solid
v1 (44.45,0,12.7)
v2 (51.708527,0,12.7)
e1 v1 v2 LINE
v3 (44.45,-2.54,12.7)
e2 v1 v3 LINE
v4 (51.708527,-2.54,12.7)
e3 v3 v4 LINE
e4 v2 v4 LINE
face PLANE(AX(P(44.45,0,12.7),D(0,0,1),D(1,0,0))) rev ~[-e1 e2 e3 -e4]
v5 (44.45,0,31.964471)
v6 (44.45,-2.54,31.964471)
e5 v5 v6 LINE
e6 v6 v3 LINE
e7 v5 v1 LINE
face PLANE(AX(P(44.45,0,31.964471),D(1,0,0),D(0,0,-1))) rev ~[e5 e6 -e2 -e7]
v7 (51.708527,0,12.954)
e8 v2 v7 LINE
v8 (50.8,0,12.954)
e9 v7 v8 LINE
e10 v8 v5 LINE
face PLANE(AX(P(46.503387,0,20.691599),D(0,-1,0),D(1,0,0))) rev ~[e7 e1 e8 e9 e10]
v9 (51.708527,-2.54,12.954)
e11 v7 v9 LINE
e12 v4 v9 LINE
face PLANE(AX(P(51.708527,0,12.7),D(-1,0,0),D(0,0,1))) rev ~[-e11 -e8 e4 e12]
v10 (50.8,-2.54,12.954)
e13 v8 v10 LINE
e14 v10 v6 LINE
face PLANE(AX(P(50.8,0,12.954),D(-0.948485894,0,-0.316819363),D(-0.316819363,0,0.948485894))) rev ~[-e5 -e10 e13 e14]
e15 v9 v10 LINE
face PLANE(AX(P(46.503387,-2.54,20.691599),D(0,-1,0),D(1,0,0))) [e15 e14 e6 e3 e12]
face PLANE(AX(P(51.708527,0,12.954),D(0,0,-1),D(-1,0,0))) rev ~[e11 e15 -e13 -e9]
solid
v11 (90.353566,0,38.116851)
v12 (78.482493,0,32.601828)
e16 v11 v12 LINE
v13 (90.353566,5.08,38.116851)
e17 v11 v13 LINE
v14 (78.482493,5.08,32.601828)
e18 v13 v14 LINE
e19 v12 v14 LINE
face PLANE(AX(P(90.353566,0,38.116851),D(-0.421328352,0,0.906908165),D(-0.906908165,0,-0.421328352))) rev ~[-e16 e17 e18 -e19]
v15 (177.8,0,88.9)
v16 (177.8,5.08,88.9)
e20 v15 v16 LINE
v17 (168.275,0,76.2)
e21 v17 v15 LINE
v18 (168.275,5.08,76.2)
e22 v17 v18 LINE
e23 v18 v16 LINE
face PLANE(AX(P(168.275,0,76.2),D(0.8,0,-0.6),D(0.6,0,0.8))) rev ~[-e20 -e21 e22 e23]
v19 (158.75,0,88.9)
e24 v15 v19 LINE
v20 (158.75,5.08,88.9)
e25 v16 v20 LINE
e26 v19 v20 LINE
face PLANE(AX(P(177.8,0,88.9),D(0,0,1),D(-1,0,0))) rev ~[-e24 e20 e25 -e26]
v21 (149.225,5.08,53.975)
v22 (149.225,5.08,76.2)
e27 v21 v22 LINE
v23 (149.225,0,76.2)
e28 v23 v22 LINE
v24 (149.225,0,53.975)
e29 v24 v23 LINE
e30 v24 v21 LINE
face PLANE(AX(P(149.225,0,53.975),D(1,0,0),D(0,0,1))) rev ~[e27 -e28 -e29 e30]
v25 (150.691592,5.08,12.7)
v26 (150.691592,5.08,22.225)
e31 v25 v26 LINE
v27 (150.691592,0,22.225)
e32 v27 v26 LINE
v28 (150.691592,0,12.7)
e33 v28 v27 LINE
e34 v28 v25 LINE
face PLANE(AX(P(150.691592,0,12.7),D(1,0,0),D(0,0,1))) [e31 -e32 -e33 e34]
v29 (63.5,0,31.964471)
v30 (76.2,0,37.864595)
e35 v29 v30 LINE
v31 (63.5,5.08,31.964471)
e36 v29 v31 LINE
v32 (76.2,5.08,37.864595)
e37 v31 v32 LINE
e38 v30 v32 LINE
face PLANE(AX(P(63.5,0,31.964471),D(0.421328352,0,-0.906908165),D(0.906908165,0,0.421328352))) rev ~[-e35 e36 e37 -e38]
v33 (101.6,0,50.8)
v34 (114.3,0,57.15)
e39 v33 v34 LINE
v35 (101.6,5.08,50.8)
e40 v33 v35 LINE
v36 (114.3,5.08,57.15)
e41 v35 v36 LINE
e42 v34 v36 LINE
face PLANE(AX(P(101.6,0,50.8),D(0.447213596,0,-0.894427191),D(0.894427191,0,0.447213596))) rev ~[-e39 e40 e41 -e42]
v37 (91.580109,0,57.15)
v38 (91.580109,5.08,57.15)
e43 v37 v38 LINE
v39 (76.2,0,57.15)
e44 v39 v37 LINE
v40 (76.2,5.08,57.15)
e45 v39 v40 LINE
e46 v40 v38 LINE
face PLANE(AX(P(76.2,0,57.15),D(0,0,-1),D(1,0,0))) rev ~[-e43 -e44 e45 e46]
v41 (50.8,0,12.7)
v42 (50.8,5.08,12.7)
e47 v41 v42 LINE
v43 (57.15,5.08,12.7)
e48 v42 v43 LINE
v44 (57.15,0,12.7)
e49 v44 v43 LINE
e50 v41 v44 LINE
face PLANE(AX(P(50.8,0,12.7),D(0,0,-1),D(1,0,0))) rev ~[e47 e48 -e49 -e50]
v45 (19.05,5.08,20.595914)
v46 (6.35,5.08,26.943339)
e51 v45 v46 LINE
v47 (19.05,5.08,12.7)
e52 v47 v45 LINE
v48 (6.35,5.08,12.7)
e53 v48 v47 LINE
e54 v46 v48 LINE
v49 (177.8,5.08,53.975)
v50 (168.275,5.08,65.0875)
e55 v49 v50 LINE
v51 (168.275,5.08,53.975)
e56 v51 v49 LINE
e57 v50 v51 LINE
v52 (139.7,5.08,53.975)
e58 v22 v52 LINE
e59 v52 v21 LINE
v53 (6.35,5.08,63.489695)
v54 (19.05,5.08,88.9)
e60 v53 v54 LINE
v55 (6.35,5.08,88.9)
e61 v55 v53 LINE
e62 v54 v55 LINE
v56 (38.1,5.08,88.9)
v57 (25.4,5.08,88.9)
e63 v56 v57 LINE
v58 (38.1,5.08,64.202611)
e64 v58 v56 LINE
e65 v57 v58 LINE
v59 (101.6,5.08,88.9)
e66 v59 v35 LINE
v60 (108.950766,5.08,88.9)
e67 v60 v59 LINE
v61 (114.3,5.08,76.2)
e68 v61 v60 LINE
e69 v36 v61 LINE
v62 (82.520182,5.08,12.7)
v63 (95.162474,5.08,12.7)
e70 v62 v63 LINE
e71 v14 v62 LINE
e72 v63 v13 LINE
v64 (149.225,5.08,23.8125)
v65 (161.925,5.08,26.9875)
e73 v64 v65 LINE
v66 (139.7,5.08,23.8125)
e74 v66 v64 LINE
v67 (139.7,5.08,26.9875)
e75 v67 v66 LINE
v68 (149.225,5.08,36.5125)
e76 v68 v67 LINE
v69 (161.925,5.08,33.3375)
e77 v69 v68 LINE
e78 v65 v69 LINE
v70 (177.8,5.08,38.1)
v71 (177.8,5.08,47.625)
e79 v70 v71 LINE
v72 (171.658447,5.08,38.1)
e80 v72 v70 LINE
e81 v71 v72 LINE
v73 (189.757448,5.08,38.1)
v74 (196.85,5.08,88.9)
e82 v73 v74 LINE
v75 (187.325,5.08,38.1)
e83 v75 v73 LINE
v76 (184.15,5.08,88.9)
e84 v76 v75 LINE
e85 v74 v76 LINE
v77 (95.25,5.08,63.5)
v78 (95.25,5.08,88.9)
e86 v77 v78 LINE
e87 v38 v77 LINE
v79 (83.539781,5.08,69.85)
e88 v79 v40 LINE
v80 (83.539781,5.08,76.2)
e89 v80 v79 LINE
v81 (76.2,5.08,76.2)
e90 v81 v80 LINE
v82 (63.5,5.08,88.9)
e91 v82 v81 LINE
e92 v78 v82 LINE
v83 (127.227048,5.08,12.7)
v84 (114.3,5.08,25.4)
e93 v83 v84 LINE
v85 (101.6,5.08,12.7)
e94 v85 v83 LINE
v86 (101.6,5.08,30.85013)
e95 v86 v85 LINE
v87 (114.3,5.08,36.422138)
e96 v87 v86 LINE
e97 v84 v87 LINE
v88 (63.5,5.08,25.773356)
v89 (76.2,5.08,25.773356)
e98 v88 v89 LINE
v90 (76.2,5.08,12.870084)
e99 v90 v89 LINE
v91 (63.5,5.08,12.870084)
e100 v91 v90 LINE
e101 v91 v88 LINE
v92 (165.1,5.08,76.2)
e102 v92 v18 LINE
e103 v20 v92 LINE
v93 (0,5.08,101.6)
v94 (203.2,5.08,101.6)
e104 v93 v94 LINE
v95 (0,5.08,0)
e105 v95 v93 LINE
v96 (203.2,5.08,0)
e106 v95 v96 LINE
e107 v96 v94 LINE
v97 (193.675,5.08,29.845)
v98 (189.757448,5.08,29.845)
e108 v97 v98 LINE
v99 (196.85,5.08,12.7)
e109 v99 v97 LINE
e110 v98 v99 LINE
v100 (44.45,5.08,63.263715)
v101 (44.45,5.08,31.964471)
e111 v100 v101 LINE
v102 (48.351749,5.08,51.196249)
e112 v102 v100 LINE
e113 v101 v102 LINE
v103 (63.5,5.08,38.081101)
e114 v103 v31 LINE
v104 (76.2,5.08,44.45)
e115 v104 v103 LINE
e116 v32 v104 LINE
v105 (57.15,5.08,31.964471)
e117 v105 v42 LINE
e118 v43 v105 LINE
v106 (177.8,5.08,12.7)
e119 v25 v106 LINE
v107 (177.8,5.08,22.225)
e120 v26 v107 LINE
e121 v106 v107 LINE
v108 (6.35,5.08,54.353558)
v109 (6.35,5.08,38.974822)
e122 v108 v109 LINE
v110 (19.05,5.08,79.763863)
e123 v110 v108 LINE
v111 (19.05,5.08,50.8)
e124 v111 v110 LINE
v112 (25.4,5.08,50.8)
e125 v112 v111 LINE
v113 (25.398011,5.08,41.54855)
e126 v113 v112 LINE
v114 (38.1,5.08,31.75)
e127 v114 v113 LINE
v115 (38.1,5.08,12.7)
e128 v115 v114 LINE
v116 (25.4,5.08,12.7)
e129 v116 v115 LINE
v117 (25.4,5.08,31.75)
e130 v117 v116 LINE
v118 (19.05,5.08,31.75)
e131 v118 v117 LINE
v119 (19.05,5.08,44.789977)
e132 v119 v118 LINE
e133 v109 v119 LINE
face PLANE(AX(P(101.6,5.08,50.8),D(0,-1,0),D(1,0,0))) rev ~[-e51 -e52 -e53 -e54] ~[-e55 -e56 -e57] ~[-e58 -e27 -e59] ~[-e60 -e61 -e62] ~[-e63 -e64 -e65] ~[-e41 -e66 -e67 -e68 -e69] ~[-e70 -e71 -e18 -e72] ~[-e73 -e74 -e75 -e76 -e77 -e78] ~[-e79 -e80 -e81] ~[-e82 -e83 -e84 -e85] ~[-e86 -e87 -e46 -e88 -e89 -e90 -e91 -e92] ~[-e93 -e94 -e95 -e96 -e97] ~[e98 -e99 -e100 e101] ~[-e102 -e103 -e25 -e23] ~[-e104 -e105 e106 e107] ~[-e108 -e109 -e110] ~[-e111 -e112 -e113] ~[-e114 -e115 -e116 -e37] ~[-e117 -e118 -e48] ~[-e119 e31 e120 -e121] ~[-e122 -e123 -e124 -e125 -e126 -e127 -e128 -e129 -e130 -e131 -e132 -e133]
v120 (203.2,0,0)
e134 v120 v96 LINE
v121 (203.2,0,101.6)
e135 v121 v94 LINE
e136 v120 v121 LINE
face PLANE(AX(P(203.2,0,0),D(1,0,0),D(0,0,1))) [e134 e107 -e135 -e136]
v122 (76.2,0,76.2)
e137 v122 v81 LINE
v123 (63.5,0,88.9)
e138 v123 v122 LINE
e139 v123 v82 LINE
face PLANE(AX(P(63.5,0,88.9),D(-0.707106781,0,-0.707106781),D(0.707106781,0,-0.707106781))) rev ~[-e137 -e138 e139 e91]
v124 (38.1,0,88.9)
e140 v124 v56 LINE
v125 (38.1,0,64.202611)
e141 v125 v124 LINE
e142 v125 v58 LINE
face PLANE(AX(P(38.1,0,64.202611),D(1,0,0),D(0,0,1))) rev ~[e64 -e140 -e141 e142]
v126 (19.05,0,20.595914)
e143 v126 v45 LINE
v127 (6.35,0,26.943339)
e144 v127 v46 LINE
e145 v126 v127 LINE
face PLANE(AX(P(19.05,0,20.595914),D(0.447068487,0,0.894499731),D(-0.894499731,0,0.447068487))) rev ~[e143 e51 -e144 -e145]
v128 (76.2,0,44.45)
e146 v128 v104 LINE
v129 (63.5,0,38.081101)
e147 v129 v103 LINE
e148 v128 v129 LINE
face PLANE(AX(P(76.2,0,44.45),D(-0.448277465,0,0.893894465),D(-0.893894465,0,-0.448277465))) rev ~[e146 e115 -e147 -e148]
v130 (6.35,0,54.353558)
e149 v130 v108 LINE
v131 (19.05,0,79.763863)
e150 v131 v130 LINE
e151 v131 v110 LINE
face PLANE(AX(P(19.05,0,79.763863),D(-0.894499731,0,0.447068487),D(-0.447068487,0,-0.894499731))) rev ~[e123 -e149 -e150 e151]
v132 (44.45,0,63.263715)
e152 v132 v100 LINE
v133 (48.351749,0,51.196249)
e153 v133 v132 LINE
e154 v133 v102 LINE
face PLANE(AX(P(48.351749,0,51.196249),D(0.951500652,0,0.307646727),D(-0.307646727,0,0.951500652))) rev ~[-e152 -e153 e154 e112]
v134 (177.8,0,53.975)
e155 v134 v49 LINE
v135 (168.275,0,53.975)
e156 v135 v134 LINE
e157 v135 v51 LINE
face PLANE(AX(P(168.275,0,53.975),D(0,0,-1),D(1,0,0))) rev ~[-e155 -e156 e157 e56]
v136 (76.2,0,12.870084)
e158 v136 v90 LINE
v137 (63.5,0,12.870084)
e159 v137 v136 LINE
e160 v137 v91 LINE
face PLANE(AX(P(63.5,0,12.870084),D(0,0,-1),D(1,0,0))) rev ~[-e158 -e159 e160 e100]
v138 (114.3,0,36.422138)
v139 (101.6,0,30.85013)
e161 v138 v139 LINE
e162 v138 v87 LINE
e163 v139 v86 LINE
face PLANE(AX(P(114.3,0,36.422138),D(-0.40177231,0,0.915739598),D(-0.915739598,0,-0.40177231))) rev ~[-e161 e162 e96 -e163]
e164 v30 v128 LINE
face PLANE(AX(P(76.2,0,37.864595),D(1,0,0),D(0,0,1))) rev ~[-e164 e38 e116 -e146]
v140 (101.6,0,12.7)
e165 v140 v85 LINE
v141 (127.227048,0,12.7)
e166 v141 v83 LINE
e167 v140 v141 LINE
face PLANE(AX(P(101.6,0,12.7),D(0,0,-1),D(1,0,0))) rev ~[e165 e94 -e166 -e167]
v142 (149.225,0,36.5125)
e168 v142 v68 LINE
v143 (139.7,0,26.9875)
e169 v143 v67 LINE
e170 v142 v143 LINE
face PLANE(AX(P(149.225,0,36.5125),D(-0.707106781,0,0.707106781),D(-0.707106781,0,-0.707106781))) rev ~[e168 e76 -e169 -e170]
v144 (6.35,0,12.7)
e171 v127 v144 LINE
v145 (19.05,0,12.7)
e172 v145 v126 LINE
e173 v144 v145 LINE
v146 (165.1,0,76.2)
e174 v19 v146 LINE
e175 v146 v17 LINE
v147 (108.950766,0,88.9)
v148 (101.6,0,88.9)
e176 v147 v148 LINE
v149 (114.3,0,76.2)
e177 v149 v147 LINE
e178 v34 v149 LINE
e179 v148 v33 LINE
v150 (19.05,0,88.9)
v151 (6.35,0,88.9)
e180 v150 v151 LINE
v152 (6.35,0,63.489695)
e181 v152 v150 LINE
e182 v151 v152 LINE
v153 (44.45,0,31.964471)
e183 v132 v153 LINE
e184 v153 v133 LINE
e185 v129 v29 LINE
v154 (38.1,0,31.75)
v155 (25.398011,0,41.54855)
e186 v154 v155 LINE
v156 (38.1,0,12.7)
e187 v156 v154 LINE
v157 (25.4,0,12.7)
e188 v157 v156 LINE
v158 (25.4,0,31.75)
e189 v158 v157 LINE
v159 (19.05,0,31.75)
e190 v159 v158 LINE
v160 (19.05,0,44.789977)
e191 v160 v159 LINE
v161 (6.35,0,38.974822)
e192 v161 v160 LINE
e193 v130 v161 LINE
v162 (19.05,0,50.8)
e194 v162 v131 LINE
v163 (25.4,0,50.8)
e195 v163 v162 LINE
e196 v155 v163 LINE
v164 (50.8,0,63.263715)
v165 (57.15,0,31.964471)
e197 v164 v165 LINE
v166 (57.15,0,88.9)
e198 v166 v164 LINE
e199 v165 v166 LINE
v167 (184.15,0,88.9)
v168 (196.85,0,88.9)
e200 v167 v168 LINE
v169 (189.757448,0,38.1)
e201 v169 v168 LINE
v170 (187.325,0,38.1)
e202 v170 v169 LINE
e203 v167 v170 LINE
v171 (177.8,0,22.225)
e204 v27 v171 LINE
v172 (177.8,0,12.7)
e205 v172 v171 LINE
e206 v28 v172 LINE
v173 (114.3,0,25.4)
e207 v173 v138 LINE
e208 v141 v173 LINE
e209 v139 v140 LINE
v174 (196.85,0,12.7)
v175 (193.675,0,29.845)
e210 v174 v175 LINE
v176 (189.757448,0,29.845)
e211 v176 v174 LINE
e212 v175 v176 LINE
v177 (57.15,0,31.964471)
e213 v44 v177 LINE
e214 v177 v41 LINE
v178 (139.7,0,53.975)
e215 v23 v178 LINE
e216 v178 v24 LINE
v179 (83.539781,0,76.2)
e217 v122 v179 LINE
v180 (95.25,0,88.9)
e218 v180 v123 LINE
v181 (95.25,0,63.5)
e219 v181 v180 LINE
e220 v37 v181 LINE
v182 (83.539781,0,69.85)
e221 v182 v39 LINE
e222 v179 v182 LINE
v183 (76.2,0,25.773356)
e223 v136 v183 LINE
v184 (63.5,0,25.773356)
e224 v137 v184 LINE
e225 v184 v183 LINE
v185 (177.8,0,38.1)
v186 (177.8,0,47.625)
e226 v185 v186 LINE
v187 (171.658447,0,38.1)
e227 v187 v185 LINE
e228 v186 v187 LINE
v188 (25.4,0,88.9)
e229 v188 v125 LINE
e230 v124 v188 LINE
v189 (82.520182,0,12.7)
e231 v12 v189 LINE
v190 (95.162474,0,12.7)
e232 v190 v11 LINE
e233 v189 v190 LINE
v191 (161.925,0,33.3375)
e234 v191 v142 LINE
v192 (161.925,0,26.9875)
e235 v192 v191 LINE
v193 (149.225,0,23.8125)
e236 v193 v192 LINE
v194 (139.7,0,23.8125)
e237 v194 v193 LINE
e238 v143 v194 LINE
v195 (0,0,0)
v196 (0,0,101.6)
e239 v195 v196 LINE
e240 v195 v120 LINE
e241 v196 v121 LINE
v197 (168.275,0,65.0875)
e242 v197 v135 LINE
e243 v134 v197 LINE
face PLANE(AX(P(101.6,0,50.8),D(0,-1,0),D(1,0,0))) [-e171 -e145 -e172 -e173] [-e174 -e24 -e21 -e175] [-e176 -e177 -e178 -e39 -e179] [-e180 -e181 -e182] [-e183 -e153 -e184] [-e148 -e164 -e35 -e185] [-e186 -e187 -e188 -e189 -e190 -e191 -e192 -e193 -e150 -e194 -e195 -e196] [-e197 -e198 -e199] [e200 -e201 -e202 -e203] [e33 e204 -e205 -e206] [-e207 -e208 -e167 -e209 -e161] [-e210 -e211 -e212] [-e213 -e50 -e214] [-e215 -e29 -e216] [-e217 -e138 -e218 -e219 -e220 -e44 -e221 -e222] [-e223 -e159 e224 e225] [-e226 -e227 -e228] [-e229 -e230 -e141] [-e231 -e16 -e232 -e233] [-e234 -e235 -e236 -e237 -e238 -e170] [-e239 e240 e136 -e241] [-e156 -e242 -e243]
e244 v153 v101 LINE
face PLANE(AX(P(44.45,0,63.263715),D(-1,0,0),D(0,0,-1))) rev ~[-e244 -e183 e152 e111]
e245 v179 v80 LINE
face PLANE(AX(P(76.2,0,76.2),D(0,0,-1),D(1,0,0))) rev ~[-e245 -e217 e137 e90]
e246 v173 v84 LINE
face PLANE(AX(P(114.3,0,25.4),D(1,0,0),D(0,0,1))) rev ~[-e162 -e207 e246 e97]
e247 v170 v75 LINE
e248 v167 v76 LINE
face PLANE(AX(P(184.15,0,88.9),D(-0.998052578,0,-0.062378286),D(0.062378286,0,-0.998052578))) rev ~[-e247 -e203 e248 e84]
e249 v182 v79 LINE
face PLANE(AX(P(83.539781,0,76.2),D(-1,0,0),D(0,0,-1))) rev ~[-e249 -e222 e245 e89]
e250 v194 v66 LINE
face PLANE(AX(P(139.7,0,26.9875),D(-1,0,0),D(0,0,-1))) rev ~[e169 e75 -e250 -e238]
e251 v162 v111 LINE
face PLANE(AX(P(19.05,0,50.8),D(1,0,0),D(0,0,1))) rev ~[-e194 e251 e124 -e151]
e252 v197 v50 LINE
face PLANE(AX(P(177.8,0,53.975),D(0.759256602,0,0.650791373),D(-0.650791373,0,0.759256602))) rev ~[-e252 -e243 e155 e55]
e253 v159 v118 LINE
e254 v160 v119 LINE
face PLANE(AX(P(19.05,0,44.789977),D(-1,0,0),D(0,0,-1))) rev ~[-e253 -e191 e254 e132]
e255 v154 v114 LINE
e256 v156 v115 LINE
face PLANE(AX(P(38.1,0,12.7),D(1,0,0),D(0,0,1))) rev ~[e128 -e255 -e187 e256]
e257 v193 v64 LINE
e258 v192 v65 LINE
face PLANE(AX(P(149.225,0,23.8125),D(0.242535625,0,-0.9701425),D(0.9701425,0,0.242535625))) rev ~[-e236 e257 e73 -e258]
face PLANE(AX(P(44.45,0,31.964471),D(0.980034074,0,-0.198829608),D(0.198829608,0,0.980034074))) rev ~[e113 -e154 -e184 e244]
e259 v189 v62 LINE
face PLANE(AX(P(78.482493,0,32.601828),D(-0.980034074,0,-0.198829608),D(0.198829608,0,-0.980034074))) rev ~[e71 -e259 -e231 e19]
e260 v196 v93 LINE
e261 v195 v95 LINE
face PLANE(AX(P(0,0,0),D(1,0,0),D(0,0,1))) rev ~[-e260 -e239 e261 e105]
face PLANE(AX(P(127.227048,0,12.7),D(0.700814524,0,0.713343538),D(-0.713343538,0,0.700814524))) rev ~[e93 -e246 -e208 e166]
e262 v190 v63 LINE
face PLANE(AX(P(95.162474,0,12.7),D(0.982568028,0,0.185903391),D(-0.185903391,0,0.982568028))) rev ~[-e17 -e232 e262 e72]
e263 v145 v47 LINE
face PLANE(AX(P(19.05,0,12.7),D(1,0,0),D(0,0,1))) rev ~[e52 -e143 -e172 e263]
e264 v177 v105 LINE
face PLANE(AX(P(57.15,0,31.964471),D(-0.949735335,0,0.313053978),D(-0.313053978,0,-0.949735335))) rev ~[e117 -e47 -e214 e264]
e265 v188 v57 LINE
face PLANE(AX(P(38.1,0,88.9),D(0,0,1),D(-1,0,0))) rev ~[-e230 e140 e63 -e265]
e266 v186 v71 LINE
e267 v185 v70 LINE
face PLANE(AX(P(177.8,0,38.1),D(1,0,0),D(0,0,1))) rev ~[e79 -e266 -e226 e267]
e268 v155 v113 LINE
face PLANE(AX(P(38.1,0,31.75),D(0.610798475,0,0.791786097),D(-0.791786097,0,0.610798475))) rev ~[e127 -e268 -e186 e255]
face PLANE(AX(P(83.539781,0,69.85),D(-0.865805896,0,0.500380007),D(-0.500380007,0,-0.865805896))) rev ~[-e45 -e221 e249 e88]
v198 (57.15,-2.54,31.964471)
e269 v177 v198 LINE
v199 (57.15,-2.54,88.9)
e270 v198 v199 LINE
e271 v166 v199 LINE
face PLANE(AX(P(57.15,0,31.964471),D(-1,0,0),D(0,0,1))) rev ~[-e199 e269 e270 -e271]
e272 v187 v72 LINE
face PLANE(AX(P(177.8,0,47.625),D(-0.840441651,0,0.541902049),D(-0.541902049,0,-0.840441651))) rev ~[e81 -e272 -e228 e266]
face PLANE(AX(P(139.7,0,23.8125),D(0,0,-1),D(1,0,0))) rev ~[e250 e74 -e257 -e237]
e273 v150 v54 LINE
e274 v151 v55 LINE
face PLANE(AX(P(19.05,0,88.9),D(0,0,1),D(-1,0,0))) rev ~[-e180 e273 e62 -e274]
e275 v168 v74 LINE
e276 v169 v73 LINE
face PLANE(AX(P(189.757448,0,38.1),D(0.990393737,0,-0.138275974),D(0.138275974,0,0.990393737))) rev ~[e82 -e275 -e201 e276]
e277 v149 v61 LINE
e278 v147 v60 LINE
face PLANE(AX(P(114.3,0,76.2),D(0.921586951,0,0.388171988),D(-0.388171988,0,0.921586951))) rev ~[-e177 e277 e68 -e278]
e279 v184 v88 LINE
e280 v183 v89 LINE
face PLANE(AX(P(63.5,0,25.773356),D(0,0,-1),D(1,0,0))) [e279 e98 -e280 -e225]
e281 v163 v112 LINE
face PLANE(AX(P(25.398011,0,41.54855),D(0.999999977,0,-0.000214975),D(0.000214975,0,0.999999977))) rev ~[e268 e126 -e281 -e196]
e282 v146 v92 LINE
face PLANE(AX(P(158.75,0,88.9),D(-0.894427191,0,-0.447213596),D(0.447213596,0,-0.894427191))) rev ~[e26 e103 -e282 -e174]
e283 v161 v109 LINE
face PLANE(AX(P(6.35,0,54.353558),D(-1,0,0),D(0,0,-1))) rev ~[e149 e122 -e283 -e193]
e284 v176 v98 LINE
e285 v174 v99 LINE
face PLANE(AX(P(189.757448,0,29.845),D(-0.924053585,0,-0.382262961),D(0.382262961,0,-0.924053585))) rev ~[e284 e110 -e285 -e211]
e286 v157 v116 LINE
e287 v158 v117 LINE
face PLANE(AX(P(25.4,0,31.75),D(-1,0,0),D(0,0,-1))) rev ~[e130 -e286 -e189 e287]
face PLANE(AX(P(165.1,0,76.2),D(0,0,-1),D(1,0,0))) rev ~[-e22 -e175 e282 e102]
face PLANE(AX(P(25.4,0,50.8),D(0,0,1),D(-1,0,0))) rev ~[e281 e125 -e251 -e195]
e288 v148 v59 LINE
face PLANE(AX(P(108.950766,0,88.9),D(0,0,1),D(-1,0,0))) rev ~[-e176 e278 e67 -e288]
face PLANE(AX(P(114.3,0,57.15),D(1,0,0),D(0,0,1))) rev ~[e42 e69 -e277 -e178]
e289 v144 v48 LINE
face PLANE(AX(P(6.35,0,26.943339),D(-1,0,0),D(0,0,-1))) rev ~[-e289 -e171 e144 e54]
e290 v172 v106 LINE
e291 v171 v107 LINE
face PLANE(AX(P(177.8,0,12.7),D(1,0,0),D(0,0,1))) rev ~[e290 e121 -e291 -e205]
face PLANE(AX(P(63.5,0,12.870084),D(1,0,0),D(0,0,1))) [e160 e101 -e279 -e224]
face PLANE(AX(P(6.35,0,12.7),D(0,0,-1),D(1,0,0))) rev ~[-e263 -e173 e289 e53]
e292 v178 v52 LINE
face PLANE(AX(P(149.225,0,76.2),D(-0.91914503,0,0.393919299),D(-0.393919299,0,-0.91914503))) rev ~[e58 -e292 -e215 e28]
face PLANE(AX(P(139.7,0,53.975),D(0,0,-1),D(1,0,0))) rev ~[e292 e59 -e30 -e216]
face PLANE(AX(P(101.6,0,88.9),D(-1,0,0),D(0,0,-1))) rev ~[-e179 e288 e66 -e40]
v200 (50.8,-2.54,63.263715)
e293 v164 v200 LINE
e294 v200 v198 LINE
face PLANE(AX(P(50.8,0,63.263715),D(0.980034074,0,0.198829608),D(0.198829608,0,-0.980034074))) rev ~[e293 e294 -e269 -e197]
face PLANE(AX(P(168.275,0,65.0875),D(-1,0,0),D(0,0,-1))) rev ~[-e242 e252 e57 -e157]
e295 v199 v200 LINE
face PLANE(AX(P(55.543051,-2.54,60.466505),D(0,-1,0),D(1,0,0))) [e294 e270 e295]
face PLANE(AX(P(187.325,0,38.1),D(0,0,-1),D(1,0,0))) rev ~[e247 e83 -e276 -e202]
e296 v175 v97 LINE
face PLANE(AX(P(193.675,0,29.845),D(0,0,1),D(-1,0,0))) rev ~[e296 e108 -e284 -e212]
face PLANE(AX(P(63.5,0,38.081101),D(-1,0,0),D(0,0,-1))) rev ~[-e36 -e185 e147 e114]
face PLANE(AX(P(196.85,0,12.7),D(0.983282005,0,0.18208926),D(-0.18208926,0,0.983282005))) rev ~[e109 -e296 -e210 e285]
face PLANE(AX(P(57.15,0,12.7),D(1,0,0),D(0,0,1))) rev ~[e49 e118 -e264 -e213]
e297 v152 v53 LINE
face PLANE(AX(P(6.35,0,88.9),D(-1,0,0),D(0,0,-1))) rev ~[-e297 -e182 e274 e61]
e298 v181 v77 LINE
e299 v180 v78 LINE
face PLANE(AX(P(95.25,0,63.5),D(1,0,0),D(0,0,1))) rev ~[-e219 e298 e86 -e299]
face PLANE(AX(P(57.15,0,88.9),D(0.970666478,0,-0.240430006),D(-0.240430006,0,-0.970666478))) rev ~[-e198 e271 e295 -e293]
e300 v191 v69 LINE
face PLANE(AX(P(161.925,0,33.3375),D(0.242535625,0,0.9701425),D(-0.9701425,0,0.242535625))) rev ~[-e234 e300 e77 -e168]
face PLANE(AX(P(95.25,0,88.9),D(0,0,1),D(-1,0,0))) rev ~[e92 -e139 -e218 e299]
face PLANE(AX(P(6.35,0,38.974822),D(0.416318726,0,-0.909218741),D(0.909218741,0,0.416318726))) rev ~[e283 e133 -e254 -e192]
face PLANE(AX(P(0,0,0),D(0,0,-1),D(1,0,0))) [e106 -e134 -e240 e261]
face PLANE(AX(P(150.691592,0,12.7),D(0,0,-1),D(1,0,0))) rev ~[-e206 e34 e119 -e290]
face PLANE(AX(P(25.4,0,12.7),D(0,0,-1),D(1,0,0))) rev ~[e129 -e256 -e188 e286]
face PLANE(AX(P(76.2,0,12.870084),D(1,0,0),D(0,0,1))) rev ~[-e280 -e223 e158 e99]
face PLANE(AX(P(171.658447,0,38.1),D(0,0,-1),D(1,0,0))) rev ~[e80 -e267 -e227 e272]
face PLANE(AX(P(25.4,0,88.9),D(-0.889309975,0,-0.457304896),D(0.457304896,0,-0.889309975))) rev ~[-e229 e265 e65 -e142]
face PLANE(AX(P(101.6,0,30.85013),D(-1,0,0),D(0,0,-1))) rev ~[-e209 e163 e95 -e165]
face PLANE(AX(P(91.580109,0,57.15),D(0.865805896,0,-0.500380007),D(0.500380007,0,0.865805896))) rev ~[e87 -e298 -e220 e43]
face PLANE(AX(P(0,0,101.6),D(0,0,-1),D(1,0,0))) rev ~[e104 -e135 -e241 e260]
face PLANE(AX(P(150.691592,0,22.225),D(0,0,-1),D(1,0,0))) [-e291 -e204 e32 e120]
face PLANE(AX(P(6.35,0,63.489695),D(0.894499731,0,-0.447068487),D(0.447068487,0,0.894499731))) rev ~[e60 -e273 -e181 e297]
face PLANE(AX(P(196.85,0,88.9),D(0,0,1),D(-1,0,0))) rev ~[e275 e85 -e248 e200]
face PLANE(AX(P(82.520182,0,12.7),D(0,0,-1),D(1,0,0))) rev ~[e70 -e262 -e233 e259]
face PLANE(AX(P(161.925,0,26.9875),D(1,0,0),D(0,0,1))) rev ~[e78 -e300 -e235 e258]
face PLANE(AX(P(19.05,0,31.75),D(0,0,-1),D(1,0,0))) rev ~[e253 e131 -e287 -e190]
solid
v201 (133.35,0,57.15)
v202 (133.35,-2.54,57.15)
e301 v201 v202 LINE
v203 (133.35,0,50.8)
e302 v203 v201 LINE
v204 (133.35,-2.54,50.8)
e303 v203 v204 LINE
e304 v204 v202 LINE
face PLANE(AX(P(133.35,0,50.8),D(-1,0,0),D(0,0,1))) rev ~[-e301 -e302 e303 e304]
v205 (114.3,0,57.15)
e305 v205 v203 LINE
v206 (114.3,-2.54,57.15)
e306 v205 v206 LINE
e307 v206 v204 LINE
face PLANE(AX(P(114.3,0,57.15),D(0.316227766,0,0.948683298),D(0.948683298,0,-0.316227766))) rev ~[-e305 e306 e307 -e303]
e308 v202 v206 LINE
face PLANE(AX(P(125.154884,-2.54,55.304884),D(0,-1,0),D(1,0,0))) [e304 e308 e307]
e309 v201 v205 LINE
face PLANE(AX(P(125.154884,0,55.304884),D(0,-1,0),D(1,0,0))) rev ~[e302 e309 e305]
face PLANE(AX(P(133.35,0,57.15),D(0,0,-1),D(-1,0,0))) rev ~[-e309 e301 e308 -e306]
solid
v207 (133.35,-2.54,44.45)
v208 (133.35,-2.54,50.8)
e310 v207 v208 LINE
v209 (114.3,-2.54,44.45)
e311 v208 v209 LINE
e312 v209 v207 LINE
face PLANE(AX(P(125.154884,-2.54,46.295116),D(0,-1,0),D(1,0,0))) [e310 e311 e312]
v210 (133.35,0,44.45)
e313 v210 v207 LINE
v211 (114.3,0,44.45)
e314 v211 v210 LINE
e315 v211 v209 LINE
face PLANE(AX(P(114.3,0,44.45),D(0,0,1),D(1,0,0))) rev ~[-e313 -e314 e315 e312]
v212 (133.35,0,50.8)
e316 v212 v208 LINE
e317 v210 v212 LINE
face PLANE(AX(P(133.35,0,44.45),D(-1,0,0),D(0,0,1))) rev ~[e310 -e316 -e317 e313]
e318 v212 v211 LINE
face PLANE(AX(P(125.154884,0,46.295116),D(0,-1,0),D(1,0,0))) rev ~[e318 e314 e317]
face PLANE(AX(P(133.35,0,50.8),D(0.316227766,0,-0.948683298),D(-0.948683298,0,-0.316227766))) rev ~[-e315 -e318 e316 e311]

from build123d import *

# Parameters (mm, degrees)
F1_W     = 203.2
F1_H     = 101.6
F2_DEPTH = 5.08
F4_W     = 12.7
F4_H     = 12.9032718343
F4_W_2   = 27.1084083955
F4_H_2   = 9.525
F6_DEPTH = 6.35
F7_DEPTH = 6.35
F8_DEPTH = 2.54


with BuildPart() as f2:
    # F1 (on Front) → F2 (new body)
    with BuildSketch(Plane.XZ):
        with Locations((101.6, 50.8)):
            Rectangle(F1_W, F1_H)
    extrude(amount=-F2_DEPTH)

    # F4 (on face) → F6 (cut)
    with BuildSketch(Plane.XZ):
        Polygon((6.35, 88.9), (6.35, 63.4896950778), (19.05, 88.9), align=None)
        Polygon((38.1, 88.9), (25.4, 88.9), (38.1, 64.2026114812), align=None)
        Polygon((19.05, 79.7638625923), (6.35, 54.3535576701), (6.35, 38.9748217106), (19.05, 44.7899766155), (19.05, 31.75), (25.4, 31.75), (25.4, 12.7), (38.1, 12.7), (38.1, 31.75), (25.3980111729, 41.5485496718), (25.4, 50.8), (19.05, 50.8), align=None)
        Polygon((19.05, 20.5959144004), (6.35, 26.9433392146), (6.35, 12.7), (19.05, 12.7), align=None)
        Polygon((48.3517487947, 51.1962487751), (44.45, 63.2637151304), (44.45, 31.964471331), align=None)
        Polygon((57.15, 12.7), (57.15, 31.964471331), (50.8, 12.7), align=None)
        with Locations((69.85, 19.3217204115)):
            Rectangle(F4_W, F4_H)
        Polygon((90.3535660462, 38.1168511729), (78.4824932634, 32.6018280187), (82.5201821204, 12.7), (95.1624735994, 12.7), align=None)
        Polygon((76.2, 44.45), (63.5, 38.0811007293), (63.5, 31.964471331), (76.2, 37.8645947099), align=None)
        Polygon((95.25, 88.9), (63.5, 88.9), (76.2, 76.2), (83.5397814848, 76.2), (83.5397814848, 69.85), (76.2, 57.15), (91.5801092576, 57.15), (95.25, 63.5), align=None)
        Polygon((101.6, 50.8), (114.3, 57.15), (114.3, 76.2), (108.9507660084, 88.9), (101.6, 88.9), align=None)
        Polygon((114.3, 36.4221383274), (101.6, 30.8501303583), (101.6, 12.7), (127.2270479083, 12.7), (114.3, 25.4), align=None)
        Polygon((149.225, 53.975), (149.225, 76.2), (139.7, 53.975), align=None)
        Polygon((177.8, 88.9), (158.75, 88.9), (165.1, 76.2), (168.275, 76.2), align=None)
        Polygon((149.225, 36.5125), (139.7, 26.9875), (139.7, 23.8125), (149.225, 23.8125), (161.925, 26.9875), (161.925, 33.3375), align=None)
        with Locations((164.2457958023, 17.4625)):
            Rectangle(F4_W_2, F4_H_2)
    extrude(amount=-F6_DEPTH, mode=Mode.SUBTRACT)

    # F4 (on face) + F5 (on face) → F7 (cut)
    with BuildSketch(Plane.XZ):
        Polygon((187.325, 88.9), (187.325, 38.1), (189.7574476064, 38.1), (196.85, 88.9), align=None)
        Polygon((193.675, 29.845), (189.7574476064, 29.845), (196.85, 12.7), align=None)
        Polygon((177.8, 38.1), (177.8, 47.625), (171.658446914, 38.1), align=None)
    with BuildSketch(Plane.XZ):
        Polygon((177.8, 53.975), (168.275, 65.0875), (168.275, 53.975), align=None)
        Polygon((196.85, 88.9), (184.15, 88.9), (187.325, 38.1), (189.7574476064, 38.1), align=None)
    extrude(amount=-F7_DEPTH, mode=Mode.SUBTRACT)

    # F5 (on face) → F8 (join)
    with BuildSketch(Plane.XZ):
        Polygon((57.15, 88.9), (50.8, 63.2637151304), (57.15, 31.964471331), align=None)
    extrude(amount=F8_DEPTH)


with BuildPart() as f8:
    # F5 (on face) → F8, piece 2 (new body)
    with BuildSketch(Plane.XZ):
        Polygon((44.45, 31.964471331), (44.45, 12.7), (50.8, 12.7), (51.7085269504, 12.7), (51.7085269504, 12.954), (50.8, 12.954), align=None)
    extrude(amount=F8_DEPTH)


with BuildPart() as f8b:
    # F5 (on face) → F8, piece 3 (new body)
    with BuildSketch(Plane.XZ):
        Polygon((133.35, 57.15), (114.3, 57.15), (133.35, 50.8), align=None)
    extrude(amount=F8_DEPTH)


with BuildPart() as f8c:
    # F5 (on face) → F8, piece 4 (new body)
    with BuildSketch(Plane.XZ):
        Polygon((133.35, 44.45), (133.35, 50.8), (114.3, 44.45), align=None)
    extrude(amount=F8_DEPTH)


solid = Compound([f2.part, f8.part, f8b.part, f8c.part])
